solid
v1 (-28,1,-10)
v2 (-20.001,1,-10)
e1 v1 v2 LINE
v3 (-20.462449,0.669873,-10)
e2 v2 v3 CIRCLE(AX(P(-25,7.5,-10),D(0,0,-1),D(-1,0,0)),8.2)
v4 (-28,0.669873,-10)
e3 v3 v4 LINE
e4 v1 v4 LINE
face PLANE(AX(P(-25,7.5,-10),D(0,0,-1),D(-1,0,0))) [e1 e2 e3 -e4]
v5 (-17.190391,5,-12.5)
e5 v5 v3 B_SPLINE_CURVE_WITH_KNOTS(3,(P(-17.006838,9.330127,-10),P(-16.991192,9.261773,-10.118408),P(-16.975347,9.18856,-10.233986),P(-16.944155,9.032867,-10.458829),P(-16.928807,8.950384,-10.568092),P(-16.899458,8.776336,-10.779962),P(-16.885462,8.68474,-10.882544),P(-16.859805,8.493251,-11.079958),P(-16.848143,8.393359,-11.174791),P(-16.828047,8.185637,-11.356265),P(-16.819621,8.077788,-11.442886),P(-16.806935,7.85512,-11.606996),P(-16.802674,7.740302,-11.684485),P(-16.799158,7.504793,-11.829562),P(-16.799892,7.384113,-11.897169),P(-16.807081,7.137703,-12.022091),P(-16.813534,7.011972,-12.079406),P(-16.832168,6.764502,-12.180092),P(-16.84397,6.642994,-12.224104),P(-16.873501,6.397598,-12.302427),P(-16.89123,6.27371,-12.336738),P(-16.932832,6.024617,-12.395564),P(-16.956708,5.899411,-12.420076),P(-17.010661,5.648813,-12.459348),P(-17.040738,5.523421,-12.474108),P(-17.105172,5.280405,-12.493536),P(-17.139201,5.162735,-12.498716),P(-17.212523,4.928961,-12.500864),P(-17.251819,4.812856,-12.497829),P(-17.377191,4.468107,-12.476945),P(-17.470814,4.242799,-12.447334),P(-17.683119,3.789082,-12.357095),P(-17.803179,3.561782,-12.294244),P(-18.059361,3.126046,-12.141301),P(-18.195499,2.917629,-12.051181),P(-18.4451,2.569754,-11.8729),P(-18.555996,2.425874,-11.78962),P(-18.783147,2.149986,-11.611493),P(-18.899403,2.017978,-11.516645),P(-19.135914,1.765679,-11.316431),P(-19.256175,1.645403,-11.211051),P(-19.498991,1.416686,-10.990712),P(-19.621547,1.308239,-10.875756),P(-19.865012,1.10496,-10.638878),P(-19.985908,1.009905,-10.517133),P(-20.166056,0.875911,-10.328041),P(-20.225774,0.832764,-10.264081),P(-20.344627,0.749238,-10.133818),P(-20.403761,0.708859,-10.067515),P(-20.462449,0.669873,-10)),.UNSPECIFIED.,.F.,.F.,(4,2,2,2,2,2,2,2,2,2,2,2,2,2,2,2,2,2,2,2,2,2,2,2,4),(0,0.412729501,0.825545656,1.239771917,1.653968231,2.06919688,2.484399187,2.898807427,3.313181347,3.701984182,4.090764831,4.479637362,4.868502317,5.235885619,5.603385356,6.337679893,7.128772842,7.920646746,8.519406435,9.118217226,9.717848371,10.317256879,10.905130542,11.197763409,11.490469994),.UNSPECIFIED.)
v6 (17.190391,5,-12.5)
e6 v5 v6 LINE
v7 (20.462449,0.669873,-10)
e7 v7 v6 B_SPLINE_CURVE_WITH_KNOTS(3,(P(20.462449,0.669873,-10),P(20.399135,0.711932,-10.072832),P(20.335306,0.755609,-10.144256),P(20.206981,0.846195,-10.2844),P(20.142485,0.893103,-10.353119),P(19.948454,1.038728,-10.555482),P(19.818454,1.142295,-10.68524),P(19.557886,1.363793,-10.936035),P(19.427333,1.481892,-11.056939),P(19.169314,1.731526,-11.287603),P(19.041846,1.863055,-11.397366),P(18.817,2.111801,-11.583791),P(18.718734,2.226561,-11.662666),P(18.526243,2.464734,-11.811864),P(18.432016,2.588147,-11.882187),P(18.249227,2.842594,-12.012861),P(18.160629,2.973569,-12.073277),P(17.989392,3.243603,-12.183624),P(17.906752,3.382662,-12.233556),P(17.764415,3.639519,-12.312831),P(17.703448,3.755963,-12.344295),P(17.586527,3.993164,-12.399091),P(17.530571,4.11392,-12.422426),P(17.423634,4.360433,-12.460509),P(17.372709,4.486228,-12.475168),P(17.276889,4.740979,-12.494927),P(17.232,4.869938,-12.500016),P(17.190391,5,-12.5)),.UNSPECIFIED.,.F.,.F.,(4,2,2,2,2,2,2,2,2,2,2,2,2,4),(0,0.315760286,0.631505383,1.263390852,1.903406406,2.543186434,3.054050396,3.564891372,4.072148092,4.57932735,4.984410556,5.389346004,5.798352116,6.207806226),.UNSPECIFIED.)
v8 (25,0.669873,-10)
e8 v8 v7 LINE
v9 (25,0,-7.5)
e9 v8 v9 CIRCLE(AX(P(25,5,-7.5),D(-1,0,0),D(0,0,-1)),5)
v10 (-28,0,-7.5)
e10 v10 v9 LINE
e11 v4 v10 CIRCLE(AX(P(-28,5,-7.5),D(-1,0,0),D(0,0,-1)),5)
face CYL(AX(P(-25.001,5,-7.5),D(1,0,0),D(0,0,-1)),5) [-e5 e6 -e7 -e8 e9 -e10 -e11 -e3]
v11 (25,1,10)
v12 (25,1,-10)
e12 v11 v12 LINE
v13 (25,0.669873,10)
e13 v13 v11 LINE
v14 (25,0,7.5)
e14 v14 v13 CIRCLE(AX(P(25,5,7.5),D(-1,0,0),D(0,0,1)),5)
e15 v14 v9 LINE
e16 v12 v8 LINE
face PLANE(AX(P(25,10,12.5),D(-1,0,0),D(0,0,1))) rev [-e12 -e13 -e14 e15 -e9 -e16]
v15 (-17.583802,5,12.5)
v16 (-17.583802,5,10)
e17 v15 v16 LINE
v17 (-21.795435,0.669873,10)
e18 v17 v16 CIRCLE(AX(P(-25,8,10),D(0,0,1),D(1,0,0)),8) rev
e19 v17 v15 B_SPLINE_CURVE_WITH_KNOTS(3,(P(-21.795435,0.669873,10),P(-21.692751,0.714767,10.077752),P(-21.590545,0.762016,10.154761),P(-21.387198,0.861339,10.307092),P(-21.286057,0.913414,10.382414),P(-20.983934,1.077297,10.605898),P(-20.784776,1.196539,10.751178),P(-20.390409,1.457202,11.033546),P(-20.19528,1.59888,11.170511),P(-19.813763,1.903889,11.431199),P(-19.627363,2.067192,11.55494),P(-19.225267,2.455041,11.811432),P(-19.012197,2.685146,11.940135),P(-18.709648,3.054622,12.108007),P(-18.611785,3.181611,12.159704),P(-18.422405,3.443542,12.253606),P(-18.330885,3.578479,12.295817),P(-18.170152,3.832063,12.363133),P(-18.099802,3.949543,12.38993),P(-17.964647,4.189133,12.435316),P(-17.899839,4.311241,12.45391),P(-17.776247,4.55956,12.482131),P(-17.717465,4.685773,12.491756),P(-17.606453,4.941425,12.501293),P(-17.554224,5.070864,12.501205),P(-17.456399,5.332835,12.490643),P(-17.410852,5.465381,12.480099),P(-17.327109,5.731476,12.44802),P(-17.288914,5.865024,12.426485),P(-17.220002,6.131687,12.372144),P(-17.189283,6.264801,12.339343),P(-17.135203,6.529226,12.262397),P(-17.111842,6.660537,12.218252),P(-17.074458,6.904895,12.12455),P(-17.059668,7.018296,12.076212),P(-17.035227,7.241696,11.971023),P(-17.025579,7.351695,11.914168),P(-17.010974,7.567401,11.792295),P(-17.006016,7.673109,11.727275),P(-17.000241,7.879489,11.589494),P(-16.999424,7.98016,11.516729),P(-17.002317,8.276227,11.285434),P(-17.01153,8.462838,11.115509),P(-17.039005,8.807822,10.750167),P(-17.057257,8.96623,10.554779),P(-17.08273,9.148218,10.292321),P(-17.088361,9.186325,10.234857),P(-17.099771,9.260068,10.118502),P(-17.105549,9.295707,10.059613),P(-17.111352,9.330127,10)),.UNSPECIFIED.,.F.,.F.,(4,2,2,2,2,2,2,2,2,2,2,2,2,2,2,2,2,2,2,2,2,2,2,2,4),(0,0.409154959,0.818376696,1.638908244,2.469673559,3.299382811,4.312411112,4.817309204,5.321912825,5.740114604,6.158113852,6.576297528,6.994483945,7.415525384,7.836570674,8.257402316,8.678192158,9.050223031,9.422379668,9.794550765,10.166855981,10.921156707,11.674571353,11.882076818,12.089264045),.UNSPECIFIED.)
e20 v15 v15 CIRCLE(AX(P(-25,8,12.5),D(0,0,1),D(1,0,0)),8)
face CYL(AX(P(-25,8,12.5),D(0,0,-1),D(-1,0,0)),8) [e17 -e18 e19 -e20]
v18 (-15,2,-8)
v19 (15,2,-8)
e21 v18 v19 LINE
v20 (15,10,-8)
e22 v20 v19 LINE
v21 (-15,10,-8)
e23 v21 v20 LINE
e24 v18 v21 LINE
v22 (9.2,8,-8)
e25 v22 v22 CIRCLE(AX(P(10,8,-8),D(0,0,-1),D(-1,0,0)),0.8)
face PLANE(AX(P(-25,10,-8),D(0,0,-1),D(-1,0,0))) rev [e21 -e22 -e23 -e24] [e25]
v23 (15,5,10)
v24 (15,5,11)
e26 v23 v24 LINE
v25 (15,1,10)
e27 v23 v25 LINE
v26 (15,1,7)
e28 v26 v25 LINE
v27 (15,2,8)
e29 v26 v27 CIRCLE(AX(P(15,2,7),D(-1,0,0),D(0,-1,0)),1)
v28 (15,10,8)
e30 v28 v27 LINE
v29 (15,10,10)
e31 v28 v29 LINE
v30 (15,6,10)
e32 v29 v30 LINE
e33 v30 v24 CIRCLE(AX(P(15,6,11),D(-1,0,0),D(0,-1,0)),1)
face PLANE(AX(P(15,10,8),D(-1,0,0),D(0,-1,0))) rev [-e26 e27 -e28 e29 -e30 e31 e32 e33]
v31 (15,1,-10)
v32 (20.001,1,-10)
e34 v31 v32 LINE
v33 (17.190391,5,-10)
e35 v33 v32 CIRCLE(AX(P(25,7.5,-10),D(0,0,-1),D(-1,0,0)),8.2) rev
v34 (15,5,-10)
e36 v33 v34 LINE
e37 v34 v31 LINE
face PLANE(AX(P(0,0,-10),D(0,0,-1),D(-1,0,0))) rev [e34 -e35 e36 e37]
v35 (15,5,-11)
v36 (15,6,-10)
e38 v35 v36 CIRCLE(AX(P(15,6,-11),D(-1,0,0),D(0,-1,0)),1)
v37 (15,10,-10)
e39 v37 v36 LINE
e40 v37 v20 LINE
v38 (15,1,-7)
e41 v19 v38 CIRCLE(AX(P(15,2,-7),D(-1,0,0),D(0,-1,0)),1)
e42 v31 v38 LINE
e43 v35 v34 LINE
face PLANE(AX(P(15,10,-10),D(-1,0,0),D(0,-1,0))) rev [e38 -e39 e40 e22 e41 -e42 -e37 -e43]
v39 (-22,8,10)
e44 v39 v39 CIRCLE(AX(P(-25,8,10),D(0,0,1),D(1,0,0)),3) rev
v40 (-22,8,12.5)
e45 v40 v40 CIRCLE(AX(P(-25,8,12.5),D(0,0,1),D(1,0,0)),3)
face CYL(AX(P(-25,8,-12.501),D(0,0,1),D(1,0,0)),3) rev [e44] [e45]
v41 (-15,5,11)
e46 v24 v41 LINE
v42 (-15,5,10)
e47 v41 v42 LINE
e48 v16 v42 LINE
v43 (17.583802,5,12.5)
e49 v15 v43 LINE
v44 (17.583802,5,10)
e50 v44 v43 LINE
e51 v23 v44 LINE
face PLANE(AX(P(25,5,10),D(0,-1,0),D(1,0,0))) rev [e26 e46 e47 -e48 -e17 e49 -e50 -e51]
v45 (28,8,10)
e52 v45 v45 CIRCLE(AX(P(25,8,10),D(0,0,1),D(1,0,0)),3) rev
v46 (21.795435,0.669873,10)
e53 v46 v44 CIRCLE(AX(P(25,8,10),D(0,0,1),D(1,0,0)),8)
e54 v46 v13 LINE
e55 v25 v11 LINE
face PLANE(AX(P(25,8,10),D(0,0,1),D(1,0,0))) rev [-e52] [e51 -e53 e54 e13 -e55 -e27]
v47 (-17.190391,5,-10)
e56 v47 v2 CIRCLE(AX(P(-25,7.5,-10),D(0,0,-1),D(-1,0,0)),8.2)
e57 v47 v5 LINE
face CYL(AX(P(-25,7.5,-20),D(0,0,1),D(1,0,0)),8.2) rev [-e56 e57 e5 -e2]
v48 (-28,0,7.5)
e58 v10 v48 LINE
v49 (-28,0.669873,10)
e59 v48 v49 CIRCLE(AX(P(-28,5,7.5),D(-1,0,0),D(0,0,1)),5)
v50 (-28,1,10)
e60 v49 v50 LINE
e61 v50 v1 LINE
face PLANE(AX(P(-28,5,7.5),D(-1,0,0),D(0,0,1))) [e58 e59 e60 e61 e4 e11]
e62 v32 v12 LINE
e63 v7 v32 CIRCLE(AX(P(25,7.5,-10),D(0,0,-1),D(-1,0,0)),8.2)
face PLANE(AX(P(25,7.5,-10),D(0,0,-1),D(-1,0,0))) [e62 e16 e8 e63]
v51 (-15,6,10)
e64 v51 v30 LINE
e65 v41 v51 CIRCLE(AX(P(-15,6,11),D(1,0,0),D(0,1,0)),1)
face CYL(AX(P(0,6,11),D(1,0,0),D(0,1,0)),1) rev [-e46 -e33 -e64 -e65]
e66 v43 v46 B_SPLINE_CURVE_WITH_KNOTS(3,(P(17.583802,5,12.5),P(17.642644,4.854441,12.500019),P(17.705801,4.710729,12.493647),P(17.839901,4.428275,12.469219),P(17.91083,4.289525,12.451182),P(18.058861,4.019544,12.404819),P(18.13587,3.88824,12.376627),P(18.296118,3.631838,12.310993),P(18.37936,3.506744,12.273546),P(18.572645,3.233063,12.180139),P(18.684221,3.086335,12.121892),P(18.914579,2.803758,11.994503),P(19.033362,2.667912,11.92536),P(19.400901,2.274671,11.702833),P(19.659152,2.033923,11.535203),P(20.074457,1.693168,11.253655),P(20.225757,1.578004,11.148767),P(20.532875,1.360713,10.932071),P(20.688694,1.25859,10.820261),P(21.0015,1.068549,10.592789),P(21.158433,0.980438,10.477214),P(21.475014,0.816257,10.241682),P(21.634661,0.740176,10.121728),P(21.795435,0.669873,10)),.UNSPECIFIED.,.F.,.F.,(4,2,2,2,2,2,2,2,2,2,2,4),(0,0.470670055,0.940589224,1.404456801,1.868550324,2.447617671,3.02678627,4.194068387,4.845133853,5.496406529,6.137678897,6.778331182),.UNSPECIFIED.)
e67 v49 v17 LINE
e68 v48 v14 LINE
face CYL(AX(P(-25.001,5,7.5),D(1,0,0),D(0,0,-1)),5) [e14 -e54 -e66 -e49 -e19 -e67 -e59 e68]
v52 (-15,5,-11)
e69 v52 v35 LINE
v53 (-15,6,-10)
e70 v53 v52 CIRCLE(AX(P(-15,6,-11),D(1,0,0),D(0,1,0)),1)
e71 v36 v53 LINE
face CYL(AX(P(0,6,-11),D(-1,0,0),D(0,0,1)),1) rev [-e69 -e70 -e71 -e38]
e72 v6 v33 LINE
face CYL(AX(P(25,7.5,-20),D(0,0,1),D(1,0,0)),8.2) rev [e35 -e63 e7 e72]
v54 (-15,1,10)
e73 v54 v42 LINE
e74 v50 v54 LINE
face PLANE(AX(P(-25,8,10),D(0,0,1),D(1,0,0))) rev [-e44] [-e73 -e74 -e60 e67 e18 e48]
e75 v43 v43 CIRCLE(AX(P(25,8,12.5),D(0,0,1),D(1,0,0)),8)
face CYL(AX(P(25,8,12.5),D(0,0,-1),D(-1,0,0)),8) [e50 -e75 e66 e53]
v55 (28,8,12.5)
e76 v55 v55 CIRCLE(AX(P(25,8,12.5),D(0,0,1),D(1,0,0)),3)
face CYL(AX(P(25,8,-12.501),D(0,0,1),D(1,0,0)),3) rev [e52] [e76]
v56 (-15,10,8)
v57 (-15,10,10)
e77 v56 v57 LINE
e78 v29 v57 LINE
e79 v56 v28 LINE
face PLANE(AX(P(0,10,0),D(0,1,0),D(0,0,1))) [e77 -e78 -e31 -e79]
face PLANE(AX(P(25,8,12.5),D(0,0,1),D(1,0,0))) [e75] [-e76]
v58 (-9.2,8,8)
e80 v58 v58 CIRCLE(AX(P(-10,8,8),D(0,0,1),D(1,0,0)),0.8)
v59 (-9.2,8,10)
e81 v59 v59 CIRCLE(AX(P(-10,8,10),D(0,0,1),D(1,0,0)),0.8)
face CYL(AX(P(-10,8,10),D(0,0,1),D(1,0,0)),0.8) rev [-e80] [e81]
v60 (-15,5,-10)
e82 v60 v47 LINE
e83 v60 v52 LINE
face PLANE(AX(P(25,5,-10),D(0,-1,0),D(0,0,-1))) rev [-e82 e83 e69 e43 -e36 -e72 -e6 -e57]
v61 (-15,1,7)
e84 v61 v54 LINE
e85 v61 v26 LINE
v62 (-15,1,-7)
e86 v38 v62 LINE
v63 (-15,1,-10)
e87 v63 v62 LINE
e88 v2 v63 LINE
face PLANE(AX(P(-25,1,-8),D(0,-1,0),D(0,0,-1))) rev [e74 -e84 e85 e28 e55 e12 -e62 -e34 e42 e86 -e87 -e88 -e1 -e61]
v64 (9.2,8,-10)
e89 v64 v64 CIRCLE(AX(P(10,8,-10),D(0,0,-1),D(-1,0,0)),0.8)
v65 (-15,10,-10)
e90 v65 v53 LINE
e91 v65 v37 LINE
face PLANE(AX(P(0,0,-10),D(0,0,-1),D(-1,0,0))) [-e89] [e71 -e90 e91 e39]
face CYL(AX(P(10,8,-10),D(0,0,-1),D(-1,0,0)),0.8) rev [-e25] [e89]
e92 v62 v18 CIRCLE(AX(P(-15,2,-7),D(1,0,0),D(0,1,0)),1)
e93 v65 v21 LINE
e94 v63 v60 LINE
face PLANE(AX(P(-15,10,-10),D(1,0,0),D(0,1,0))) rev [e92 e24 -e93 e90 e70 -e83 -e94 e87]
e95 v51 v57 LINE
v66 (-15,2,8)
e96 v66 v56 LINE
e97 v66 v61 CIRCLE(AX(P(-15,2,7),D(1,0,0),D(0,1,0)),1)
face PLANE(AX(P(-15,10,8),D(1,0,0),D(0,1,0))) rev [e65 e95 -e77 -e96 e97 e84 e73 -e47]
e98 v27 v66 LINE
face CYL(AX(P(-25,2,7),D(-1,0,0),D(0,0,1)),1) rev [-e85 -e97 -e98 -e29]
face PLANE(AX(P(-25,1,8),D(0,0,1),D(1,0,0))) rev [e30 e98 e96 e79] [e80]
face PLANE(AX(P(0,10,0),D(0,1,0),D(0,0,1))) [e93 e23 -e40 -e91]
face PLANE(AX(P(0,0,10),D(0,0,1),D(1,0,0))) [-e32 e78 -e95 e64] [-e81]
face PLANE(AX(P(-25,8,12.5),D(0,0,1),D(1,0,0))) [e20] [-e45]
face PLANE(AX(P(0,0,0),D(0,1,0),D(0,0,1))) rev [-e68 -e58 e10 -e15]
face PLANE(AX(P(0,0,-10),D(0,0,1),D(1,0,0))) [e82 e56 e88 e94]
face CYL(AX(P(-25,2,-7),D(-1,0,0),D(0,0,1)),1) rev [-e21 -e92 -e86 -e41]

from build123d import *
from build123d.topology import SkipClean

# Parameters (mm, degrees)
SKETCH_1_W               = 50
SKETCH_1_H               = 25
EXTRUDE_1_DEPTH          = 10
CUT_EXTRUDE_1_REACH      = 54.5
SKETCH_3_W               = 16
SKETCH_3_H               = 9
CUT_EXTRUDE_2_DEPTH      = 53.5
SKETCH_14_W              = 50
SKETCH_14_H              = 5
CUT_EXTRUDE_5_DEPTH      = 2.5
SKETCH_15_W              = 50
SKETCH_15_H              = 5
CUT_EXTRUDE_6_DEPTH      = 2.5
HOLE_WIZARD_M2_1_D       = 1.6
HOLE_WIZARD_M2_1_DEPTH   = 2
HOLE_WIZARD_M2_2_D       = 1.6
HOLE_WIZARD_M2_2_DEPTH   = 2
SKETCH_19_W              = 10
SKETCH_19_H              = 9
CUT_EXTRUDE_10_DEPTH     = 2
SKETCH_21_R              = 8
EXTRUDE_5_DEPTH          = 2.5
SKETCH_22_W              = 10
SKETCH_22_H              = 9
CUT_EXTRUDE_12_DEPTH     = 2
CUT_EXTRUDE_START        = -2.5
CUT_EXTRUDE_13_OUTLINE_R = 3
CUT_EXTRUDE_13_DEPTH     = 2.5
SKETCH_17_R              = 8.2
CUT_EXTRUDE_15_DEPTH     = 10
EXTRUDE_6_DEPTH          = 3
FILLET_1_R               = 1
FILLET_2_R               = 1


# Read off the part's stored shape, not the designer's step: 切除-拉伸13
with BuildPart() as part:
    # 草图1 → 凸台-拉伸1 (new body)
    with BuildSketch(Plane(origin=(0, 0, 0), x_dir=(1, 0, 0), z_dir=(0, 1, 0))):
        Rectangle(SKETCH_1_W, SKETCH_1_H)
    extrude(amount=EXTRUDE_1_DEPTH)

    # 草图2 → 切除-拉伸1 (cut, up to next)
    with BuildSketch(Plane(origin=(25, 0, 0), x_dir=(0, 0, -1), z_dir=(1, 0, 0)), mode=Mode.PRIVATE) as cut_extrude_1_sk1:
        with BuildLine():
            Line((-12.5, 0), (-7.5, 0))
            ThreePointArc((-7.5, 0), (-11.035533906, 1.464466094), (-12.5, 5))
            Line((-12.5, 5), (-12.5, 0))
        make_face()
    cut_extrude_1_tool1 = extrude(cut_extrude_1_sk1.sketch, amount=-CUT_EXTRUDE_1_REACH, mode=Mode.PRIVATE) & part.part
    # 草图2 → 切除-拉伸1 (cut, up to next)
    with BuildSketch(Plane(origin=(25, 0, 0), x_dir=(0, 0, -1), z_dir=(1, 0, 0)), mode=Mode.PRIVATE) as cut_extrude_1_sk2:
        with BuildLine():
            Line((12.5, 5), (12.5, 0))
            Line((12.5, 0), (7.5, 0))
            ThreePointArc((7.5, 0), (11.035533906, 1.464466094), (12.5, 5))
        make_face()
    cut_extrude_1_tool2 = extrude(cut_extrude_1_sk2.sketch, amount=-CUT_EXTRUDE_1_REACH, mode=Mode.PRIVATE) & part.part
    add(cut_extrude_1_tool1.solids().sort_by_distance((25, 1.11684, 11.38316))[0], mode=Mode.SUBTRACT)
    add(cut_extrude_1_tool2.solids().sort_by_distance((25, 1.11684, -11.38316))[0], mode=Mode.SUBTRACT)

    # 草图3 → 切除-拉伸2 (cut, through all)
    with BuildSketch(Plane(origin=(25, 0, 0), x_dir=(0, 0, -1), z_dir=(1, 0, 0))):
        with Locations((0, 5.5)):
            Rectangle(SKETCH_3_W, SKETCH_3_H)
    extrude(amount=-CUT_EXTRUDE_2_DEPTH, mode=Mode.SUBTRACT)

    # 草图14 → 切除-拉伸5 (cut)
    with BuildSketch(Plane(origin=(0, 0, -12.5), x_dir=(-1, 0, 0), z_dir=(0, 0, -1))):
        with Locations((0, 7.5)):
            Rectangle(SKETCH_14_W, SKETCH_14_H)
    extrude(amount=-CUT_EXTRUDE_5_DEPTH, mode=Mode.SUBTRACT)

    # 草图15 → 切除-拉伸6 (cut)
    with BuildSketch(Plane.XY.offset(12.5)):
        with Locations((0, 7.5)):
            Rectangle(SKETCH_15_W, SKETCH_15_H)
    extrude(amount=-CUT_EXTRUDE_6_DEPTH, mode=Mode.SUBTRACT)

    # M2 螺纹孔1
    with Locations(Plane(origin=(0, 0, -10), x_dir=(-1, 0, 0), z_dir=(0, 0, -1))):
        with Locations((-10, 8)):
            Hole(HOLE_WIZARD_M2_1_D / 2, depth=HOLE_WIZARD_M2_1_DEPTH)

    # M2 螺纹孔2
    with Locations(Plane.XY.offset(10)):
        with Locations((-10, 8)):
            Hole(HOLE_WIZARD_M2_2_D / 2, depth=HOLE_WIZARD_M2_2_DEPTH)

    # 草图19 → 切除-拉伸10 (cut)
    with BuildSketch(Plane.XY.offset(-8)):
        with Locations((-20, 5.5)):
            Rectangle(SKETCH_19_W, SKETCH_19_H)
        with Locations((20, 5.5)):
            Rectangle(SKETCH_19_W, SKETCH_19_H)
    extrude(amount=-CUT_EXTRUDE_10_DEPTH, mode=Mode.SUBTRACT)

    # 草图21 → 凸台-拉伸5 (add)
    with SkipClean():  # the faces are left unmerged after this step: merging them gives an invalid solid
        with BuildSketch(Plane.XY.offset(10)):
            with Locations((25, 8)):
                Circle(SKETCH_21_R)
            with Locations((-25, 8)):
                Circle(SKETCH_21_R)
        extrude(amount=EXTRUDE_5_DEPTH)

    # 草图22 → 切除-拉伸12 (cut)
    with SkipClean():  # the faces are left unmerged after this step: merging them gives an invalid solid
        with BuildSketch(Plane.XY.offset(10)):
            with Locations((-20, 5.5)):
                Rectangle(SKETCH_22_W, SKETCH_22_H)
            with Locations((20, 5.5)):
                Rectangle(SKETCH_22_W, SKETCH_22_H)
        extrude(amount=-CUT_EXTRUDE_12_DEPTH, mode=Mode.SUBTRACT)

    # 切除-拉伸13 outline → 切除-拉伸13 (cut)
    with SkipClean():  # the faces are left unmerged after this step: merging them gives an invalid solid
        with BuildSketch(Plane.XY.offset(12.5).offset(CUT_EXTRUDE_START)):
            with Locations((25, 8)):
                Circle(CUT_EXTRUDE_13_OUTLINE_R)
            with Locations((-25, 8)):
                Circle(CUT_EXTRUDE_13_OUTLINE_R)
        extrude(amount=CUT_EXTRUDE_13_DEPTH, mode=Mode.SUBTRACT)

    # 草图17 → 切除-拉伸15 (cut)
    with SkipClean():  # the faces are left unmerged after this step: merging them gives an invalid solid
        with BuildSketch(Plane(origin=(0, 0, -10), x_dir=(-1, 0, 0), z_dir=(0, 0, -1))):
            with Locations((-25, 7.5)):
                Circle(SKETCH_17_R)
            with Locations((25, 7.5)):
                Circle(SKETCH_17_R)
        extrude(amount=CUT_EXTRUDE_15_DEPTH, mode=Mode.SUBTRACT)

    # 草图24 → 凸台-拉伸6 (add)
    with SkipClean():  # the faces are left unmerged after this step: merging them gives an invalid solid
        with BuildSketch(Plane.ZY.offset(25)):
            with BuildLine():
                Line((10, 1), (-10, 1))
                Line((-10, 1), (-10, 0.669872981))
                ThreePointArc((-10, 0.669872981), (-8.794095226, 0.170370869), (-7.5, 0))
                Line((-7.5, 0), (7.5, 0))
                ThreePointArc((7.5, 0), (8.794095226, 0.170370869), (10, 0.669872981))
                Line((10, 0.669872981), (10, 1))
            make_face()
        extrude(amount=EXTRUDE_6_DEPTH)

    # 圆角1
    # the kernel refuses this fillet: 1 mm, written as the material it adds along each edge
    with BuildSketch(Plane(origin=(15, 1, 8), x_dir=(0, 0, -1), z_dir=(-1, 0, 0))) as fillet_1_piece_1:
        with BuildLine():
            CenterArc((FILLET_1_R, -FILLET_1_R), FILLET_1_R, 90, 90)
            Line((0, -FILLET_1_R), (0, 0))
            Line((0, 0), (FILLET_1_R, 0))
        make_face()
    extrude(amount=30)
    with BuildSketch(Plane(origin=(15, 1, -8), x_dir=(0, 0, 1), z_dir=(-1, 0, 0))) as fillet_1_piece_2:
        with BuildLine():
            CenterArc((FILLET_1_R, FILLET_1_R), FILLET_1_R, 180, 90)
            Line((0, FILLET_1_R), (0, 0))
            Line((0, 0), (FILLET_1_R, 0))
        make_face()
    extrude(amount=30)

    # 圆角2
    fillet_2_edges = [part.edges().sort_by_distance(p)[0] for p in [
        (0, 5, -10),
        (0, 5, 10),
    ]]
    fillet(fillet_2_edges, radius=FILLET_2_R)


solid = part.part
